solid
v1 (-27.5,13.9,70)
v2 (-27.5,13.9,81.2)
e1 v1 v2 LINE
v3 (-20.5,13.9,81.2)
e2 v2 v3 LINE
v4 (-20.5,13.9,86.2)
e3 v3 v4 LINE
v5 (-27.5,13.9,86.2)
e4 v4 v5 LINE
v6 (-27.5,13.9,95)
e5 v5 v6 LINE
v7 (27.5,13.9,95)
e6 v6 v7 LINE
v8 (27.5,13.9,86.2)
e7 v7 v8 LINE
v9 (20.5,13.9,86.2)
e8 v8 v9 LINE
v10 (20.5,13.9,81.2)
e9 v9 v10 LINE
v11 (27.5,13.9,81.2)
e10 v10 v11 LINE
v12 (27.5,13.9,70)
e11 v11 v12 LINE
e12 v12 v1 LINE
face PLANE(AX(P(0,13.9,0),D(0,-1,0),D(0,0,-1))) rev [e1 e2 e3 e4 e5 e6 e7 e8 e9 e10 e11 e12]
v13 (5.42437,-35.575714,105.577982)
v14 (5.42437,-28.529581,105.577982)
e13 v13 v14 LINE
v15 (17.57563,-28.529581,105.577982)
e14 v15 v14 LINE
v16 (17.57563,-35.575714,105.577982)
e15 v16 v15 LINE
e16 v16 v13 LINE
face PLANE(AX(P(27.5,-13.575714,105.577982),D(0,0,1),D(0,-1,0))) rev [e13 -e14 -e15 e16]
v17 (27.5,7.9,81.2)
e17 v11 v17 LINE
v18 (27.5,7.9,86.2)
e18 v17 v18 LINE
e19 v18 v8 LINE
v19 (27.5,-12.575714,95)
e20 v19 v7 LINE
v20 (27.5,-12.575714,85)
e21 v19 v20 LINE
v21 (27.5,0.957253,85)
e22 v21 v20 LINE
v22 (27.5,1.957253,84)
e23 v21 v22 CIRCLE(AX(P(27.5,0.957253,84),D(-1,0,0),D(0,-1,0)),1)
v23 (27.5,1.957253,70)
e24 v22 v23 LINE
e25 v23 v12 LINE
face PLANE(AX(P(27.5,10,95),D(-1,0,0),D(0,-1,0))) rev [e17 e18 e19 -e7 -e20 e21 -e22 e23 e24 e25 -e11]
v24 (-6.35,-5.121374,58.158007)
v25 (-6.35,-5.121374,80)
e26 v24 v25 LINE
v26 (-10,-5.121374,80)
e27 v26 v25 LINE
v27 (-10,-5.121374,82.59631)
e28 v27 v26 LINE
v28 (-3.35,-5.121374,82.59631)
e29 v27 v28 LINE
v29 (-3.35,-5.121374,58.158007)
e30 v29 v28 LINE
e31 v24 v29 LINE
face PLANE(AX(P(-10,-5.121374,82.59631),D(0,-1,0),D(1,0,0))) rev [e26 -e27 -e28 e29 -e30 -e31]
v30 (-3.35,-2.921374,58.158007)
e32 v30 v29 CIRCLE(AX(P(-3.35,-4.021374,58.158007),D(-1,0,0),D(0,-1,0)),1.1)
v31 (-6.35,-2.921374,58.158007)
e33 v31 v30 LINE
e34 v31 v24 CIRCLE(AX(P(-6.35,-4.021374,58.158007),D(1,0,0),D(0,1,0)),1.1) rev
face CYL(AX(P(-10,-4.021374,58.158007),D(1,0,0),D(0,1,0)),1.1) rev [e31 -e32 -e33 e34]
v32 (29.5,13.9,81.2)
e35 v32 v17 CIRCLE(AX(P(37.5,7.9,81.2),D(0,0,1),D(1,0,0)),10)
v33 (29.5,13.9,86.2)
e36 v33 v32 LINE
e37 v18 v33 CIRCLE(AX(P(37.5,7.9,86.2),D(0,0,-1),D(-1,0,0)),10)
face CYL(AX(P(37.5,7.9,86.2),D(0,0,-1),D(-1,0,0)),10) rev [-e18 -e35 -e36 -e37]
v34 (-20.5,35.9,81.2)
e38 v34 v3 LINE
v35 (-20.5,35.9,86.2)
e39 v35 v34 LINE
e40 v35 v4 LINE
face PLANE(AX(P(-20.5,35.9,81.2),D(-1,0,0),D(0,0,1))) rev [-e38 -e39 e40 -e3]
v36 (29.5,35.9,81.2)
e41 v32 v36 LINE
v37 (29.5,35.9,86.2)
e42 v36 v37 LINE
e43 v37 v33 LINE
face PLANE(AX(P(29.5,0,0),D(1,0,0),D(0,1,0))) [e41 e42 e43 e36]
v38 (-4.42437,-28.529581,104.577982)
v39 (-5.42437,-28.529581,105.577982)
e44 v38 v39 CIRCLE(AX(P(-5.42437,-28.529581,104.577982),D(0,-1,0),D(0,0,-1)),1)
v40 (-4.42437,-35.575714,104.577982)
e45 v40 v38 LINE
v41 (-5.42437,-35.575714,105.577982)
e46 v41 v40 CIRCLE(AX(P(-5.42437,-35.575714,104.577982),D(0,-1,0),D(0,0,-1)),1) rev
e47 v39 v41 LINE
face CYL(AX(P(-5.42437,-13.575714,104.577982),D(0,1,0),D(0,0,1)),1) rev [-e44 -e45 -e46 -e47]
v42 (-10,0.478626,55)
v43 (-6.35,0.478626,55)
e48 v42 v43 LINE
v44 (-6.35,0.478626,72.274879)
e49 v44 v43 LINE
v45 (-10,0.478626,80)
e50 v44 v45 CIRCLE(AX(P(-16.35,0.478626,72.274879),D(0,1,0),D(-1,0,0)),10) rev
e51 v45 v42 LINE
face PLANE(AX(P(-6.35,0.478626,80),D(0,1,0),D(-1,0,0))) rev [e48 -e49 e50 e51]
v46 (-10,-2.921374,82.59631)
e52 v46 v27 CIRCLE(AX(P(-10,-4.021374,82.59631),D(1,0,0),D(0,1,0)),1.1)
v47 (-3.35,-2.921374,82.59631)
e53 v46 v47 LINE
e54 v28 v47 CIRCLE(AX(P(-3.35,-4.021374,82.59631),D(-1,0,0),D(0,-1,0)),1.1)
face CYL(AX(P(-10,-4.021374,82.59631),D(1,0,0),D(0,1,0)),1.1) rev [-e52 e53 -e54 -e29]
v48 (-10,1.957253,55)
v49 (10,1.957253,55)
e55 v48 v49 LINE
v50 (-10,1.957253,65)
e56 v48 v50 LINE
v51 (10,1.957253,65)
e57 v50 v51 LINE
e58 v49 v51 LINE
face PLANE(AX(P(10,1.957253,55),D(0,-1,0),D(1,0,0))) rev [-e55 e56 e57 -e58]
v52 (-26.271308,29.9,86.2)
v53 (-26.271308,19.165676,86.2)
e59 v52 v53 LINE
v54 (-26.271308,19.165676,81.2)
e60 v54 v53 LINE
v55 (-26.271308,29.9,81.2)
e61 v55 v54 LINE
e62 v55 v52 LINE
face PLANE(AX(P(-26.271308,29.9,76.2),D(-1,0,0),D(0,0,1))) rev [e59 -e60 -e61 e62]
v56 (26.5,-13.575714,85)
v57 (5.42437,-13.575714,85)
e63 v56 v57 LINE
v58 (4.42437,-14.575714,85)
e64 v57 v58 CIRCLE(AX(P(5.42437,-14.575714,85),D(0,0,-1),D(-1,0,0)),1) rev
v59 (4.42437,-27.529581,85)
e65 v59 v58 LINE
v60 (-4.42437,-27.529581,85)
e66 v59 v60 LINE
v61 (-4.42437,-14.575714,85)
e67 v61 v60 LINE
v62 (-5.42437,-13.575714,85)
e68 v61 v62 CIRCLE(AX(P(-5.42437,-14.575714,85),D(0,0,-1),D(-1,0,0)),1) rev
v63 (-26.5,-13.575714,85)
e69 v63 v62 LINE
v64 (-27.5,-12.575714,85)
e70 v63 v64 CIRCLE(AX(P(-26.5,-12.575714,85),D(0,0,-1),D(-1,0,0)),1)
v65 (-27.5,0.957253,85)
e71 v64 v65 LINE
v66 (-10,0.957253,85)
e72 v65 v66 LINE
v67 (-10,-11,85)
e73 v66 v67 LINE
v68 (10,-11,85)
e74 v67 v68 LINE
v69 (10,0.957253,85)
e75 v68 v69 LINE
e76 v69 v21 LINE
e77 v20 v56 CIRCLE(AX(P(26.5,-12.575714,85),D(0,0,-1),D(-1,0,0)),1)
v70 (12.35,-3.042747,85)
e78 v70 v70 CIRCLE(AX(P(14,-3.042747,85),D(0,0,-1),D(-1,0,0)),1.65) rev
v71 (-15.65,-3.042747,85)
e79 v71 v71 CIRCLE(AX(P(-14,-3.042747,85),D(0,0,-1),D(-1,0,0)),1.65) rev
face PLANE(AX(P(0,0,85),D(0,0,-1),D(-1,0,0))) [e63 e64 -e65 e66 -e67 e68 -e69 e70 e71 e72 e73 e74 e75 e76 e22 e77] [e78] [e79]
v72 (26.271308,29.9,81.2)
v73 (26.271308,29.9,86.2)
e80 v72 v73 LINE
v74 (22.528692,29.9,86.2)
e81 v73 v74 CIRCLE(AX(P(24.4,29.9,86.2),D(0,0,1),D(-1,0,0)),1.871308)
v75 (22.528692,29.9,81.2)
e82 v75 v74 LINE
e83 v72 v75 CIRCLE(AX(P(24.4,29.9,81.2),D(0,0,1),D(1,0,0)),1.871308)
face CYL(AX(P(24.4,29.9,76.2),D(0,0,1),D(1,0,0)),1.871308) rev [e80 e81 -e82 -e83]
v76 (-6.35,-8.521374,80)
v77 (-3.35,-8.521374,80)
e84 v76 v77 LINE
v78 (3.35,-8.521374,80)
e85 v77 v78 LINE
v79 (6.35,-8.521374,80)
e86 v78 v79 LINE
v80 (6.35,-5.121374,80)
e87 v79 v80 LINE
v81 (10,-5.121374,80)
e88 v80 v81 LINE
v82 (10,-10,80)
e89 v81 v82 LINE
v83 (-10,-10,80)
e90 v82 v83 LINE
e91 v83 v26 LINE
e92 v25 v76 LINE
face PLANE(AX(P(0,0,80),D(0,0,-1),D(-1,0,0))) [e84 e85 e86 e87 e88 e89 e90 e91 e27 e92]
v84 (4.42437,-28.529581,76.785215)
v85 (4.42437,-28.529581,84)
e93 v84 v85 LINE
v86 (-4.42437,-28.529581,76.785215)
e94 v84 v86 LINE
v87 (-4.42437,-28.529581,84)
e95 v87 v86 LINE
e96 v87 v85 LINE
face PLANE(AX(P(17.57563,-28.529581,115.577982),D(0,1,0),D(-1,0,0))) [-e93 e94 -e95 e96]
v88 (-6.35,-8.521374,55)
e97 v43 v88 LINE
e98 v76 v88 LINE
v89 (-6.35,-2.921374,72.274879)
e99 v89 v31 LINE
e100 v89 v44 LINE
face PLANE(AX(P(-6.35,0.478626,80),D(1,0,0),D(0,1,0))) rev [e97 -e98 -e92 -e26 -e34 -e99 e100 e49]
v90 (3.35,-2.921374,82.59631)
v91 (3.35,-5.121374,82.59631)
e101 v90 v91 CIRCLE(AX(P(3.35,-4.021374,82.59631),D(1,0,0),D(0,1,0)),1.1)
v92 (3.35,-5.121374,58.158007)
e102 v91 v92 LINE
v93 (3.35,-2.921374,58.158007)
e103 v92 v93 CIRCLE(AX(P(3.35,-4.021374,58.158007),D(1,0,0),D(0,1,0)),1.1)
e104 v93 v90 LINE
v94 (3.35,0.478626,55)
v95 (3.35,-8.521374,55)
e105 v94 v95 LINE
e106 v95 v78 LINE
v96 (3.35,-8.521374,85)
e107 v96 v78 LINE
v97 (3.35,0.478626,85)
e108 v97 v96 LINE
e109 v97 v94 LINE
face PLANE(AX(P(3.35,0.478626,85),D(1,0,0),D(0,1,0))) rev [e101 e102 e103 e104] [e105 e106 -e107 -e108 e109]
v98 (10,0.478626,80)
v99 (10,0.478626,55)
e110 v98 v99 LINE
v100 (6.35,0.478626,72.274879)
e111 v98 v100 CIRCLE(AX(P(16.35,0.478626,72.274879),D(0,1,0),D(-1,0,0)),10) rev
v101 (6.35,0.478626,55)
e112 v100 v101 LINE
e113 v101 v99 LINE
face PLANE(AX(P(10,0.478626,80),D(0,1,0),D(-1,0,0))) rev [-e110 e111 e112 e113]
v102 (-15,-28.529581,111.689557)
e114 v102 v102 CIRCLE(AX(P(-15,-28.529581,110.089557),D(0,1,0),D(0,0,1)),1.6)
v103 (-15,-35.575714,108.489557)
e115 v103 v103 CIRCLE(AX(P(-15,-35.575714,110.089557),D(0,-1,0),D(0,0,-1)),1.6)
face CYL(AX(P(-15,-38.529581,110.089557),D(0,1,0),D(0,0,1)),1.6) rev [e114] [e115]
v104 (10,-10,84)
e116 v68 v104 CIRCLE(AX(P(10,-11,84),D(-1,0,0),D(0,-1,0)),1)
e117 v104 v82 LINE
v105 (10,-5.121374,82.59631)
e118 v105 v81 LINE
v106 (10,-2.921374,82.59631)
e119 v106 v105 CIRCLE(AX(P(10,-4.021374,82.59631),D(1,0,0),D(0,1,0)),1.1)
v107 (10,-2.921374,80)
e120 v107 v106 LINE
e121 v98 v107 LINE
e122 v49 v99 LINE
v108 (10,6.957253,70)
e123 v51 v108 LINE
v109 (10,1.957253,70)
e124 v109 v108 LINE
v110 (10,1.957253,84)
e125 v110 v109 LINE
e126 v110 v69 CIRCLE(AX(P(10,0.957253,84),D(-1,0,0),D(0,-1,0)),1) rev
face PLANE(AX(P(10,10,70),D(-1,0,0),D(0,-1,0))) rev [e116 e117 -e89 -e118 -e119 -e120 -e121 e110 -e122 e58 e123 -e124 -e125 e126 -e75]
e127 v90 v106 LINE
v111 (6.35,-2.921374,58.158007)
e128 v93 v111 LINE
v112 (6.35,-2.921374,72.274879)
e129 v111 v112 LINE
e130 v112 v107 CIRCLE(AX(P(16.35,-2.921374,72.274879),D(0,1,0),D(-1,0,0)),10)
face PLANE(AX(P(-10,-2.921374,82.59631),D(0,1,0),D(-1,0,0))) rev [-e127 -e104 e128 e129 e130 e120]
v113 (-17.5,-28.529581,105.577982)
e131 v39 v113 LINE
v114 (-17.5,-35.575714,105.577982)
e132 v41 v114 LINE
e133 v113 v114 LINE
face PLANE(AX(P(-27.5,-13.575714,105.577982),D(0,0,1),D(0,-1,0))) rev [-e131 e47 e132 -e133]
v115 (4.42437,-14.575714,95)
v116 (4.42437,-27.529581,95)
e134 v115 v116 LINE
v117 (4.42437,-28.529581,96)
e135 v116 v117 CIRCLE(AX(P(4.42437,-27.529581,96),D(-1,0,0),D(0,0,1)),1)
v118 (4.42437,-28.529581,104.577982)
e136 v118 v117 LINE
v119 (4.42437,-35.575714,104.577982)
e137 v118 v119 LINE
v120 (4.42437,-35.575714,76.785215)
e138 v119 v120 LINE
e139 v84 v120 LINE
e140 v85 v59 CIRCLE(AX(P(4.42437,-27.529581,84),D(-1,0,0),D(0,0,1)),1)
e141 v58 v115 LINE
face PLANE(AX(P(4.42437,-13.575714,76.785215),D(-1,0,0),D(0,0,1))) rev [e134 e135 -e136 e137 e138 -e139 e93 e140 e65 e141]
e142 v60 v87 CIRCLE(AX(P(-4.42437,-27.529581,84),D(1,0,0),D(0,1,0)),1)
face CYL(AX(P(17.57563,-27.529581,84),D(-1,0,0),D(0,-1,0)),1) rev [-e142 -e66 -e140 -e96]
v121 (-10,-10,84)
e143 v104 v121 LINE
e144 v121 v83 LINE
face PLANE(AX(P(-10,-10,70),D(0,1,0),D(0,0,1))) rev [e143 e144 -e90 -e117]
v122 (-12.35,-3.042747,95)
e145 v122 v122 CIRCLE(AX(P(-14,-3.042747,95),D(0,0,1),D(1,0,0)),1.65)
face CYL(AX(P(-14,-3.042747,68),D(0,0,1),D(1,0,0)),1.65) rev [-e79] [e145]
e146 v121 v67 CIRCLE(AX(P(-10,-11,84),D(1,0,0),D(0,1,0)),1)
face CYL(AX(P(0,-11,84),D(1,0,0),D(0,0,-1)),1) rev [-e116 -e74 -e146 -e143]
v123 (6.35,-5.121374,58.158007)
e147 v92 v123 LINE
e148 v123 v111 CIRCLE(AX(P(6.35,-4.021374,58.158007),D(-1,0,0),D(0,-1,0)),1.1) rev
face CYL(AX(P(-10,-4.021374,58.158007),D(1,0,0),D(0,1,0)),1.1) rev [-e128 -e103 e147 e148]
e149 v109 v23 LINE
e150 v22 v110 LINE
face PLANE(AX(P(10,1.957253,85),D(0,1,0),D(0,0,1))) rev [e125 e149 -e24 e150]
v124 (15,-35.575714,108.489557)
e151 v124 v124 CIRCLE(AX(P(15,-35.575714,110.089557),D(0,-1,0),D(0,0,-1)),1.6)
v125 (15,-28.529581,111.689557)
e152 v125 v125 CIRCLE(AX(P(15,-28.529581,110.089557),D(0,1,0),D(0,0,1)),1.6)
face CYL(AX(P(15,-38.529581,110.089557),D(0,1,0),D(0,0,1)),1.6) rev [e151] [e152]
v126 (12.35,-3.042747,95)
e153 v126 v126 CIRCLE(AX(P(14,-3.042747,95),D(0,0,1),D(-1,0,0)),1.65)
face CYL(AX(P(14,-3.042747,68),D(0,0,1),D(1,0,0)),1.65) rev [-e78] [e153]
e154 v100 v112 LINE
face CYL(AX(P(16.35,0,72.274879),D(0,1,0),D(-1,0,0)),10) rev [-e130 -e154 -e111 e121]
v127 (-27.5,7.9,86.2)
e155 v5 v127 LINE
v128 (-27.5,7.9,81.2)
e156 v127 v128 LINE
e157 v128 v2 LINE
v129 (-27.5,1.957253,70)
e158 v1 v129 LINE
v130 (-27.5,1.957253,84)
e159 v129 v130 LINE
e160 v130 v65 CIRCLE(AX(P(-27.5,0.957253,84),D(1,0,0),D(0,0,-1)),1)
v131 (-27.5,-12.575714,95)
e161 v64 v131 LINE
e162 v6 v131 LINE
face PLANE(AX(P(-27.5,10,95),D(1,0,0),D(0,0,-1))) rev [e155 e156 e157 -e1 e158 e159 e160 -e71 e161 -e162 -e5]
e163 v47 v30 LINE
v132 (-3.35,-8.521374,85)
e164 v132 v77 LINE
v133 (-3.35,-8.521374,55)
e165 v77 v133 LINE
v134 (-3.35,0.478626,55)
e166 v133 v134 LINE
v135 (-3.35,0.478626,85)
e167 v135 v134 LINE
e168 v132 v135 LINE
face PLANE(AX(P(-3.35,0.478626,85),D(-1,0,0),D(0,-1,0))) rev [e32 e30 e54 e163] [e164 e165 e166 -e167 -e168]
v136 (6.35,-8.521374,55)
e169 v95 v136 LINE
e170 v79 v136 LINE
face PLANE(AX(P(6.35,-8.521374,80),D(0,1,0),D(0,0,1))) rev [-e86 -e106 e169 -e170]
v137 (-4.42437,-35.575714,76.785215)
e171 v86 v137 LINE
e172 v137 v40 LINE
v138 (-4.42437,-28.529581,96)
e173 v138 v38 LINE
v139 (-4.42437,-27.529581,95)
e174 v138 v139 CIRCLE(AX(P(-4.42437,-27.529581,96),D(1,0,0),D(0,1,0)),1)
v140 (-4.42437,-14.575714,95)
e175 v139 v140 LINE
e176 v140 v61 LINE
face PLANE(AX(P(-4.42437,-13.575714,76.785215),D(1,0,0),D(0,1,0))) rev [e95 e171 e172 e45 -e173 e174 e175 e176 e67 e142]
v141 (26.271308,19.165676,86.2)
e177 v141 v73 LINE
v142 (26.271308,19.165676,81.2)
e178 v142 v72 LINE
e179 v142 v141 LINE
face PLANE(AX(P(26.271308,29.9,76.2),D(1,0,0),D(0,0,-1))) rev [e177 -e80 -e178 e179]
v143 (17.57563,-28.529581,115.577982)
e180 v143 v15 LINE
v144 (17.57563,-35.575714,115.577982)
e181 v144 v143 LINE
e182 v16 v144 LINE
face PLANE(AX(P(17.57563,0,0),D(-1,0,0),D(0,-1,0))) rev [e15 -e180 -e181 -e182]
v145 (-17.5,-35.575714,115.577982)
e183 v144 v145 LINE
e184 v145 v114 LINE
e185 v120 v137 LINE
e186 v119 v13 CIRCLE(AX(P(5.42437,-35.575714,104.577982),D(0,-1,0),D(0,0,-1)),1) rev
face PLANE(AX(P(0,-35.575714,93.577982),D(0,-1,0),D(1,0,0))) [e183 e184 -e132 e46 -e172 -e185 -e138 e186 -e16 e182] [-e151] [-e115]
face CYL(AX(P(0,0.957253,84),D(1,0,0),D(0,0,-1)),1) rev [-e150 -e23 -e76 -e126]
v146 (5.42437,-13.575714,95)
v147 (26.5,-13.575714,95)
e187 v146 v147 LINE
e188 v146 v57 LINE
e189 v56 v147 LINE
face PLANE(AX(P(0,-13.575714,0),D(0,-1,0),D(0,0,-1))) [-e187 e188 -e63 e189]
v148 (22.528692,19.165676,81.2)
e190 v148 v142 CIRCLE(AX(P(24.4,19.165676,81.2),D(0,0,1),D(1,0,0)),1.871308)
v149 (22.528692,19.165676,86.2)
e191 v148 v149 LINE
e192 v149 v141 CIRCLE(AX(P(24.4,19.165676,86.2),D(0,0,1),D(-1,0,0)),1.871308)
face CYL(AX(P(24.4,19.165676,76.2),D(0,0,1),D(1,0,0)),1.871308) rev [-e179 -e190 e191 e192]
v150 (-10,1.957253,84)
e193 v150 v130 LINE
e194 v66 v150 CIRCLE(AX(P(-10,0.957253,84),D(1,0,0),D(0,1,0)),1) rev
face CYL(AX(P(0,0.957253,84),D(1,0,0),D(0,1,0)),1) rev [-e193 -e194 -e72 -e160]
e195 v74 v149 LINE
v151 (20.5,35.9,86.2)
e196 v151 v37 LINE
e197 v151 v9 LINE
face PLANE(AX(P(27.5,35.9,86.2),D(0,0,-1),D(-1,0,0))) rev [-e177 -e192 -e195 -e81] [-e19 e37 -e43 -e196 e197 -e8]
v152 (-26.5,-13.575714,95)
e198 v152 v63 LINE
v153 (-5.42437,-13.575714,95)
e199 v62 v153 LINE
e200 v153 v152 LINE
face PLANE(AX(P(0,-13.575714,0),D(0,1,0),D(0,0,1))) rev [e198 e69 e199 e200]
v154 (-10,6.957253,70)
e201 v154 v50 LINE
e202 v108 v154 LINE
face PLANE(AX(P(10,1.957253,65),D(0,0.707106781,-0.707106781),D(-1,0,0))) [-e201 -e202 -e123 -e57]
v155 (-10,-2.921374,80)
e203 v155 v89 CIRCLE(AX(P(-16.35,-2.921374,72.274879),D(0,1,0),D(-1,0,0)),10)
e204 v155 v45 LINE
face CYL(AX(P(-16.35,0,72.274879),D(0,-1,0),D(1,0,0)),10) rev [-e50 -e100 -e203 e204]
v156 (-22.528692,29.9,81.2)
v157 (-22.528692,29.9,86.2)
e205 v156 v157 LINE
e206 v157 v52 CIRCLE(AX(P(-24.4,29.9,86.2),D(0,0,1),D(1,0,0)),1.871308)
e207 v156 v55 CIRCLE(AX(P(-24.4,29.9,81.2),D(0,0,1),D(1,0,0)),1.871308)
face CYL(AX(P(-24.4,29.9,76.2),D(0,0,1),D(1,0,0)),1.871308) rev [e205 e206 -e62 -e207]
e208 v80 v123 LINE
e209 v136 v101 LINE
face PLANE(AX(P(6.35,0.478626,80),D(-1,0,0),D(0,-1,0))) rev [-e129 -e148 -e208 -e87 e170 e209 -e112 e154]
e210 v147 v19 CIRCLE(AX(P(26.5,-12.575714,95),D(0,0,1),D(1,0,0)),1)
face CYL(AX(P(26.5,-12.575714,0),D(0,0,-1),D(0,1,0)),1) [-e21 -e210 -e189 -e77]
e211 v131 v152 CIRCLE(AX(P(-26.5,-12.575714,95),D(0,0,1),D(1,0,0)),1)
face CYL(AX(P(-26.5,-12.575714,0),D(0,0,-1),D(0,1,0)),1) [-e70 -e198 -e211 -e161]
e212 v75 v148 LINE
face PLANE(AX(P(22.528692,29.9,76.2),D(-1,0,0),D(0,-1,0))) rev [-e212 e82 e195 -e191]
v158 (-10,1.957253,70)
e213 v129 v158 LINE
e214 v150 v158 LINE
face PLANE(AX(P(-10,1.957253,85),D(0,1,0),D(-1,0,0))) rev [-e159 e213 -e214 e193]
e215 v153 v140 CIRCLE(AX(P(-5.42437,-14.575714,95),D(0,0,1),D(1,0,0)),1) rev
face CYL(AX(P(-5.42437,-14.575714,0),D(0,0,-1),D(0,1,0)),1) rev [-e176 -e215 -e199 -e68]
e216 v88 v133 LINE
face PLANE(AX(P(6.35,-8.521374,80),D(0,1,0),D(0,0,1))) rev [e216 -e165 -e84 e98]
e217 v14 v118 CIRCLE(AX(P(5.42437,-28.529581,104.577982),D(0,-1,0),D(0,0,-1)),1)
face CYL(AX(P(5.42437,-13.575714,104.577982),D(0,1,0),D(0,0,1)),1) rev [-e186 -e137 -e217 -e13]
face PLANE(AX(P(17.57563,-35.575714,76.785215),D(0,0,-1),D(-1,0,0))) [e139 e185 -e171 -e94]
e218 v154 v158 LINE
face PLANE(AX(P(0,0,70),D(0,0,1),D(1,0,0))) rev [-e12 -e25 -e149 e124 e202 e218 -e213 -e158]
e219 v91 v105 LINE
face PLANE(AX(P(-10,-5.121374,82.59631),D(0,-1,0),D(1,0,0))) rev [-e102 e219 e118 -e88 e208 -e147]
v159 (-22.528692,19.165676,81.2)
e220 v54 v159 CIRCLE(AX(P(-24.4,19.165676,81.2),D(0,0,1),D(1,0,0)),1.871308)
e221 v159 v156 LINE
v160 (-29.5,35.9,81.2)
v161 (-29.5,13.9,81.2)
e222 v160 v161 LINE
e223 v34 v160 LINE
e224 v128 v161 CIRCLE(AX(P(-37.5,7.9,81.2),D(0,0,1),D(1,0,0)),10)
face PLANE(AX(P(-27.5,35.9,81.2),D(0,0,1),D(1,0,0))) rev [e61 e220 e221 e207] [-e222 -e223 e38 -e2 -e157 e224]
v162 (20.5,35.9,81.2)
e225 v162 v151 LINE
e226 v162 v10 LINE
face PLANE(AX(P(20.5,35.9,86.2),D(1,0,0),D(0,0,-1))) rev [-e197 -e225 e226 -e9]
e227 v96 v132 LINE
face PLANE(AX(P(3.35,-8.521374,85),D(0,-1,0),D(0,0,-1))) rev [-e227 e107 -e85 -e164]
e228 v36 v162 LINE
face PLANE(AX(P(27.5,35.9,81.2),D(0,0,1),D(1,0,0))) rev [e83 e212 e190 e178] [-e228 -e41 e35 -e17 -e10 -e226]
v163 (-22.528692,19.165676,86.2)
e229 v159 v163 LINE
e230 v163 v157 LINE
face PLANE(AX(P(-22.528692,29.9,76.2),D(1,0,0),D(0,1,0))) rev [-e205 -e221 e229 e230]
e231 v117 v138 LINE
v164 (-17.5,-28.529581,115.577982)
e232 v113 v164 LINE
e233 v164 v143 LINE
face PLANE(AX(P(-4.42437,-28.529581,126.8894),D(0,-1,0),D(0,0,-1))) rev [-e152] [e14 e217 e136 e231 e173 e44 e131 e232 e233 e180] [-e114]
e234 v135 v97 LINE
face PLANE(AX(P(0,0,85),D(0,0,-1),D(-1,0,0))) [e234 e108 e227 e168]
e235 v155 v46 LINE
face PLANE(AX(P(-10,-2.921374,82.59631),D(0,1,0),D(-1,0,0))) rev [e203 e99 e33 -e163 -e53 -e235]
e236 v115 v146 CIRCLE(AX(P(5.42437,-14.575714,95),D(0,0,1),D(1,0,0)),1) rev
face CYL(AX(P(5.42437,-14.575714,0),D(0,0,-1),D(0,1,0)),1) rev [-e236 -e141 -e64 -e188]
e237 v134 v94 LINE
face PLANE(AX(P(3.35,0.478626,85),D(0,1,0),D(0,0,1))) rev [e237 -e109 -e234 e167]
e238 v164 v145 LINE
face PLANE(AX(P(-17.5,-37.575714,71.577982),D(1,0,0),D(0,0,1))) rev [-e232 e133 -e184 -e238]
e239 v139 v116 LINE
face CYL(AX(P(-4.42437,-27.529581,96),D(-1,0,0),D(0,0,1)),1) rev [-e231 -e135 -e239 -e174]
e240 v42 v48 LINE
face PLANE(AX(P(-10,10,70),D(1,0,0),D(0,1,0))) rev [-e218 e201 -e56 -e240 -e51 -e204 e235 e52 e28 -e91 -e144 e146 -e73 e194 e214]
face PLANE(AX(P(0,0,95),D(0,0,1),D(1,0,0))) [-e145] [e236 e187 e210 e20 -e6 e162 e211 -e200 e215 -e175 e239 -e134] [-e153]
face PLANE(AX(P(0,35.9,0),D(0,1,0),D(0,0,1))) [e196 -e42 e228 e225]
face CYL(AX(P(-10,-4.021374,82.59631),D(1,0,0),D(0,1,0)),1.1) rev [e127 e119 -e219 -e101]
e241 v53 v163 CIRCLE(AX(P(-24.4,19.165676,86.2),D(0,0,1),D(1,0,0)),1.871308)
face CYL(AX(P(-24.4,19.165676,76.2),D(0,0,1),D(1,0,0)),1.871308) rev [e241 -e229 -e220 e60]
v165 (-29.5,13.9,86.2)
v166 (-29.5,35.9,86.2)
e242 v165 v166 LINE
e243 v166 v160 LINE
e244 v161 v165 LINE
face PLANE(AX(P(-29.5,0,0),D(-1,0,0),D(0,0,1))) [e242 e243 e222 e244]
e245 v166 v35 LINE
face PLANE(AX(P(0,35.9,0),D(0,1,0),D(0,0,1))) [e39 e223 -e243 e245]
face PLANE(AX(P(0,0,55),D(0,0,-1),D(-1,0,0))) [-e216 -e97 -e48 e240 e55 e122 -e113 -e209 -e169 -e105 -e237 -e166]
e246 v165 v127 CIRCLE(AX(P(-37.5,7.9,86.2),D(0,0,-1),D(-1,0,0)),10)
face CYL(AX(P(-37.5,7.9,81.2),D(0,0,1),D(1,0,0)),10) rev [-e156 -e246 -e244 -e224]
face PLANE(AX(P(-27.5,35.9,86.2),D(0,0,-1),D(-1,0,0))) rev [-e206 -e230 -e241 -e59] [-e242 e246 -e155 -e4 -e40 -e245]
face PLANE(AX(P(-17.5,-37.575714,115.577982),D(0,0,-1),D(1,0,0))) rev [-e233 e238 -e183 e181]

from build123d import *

# Parameters (mm, degrees)
SKETCH_1_W            = 35
SKETCH_1_H            = 40
EXTRUDE_1_DEPTH       = 5
SKETCH_2_W            = 20
SKETCH_2_H            = 20
EXTRUDE_2_DEPTH       = 65
SKETCH_3_W            = 56
SKETCH_3_H            = 11
SKETCH_3_W_2          = 4.5
CUT_EXTRUDE_1_DEPTH   = 78.821912081
SKETCH_5_W            = 55
SKETCH_5_H            = 20
EXTRUDE_3_DEPTH       = 25
SKETCH_9_R            = 1.65
CUT_EXTRUDE_3_DEPTH   = 27
SKETCH_10_W           = 55
SKETCH_10_H           = 25
EXTRUDE_4_DEPTH       = 4.9
SKETCH_11_W           = 7
SKETCH_11_H           = 5
EXTRUDE_5_DEPTH       = 21
CHAMFER_2_SIZE        = 10
CHAMFER_3_SIZE        = 3
CHAMFER_4_SIZE        = 2
CUT_EXTRUDE_7_DEPTH   = 15
SKETCH_16_W           = 12.984556049
SKETCH_16_H           = 11
EXTRUDE_6_DEPTH       = 20
CHAMFER_5_SIZE        = 3
SKETCH_19_R           = 1.6
CUT_EXTRUDE_10_DEPTH  = 10
FILLET_1_R            = 5
SKETCH_20_W           = 5
SKETCH_20_H           = 22.5
EXTRUDE_7_DEPTH       = 17.5
SKETCH_21_W           = 5
SKETCH_21_H           = 22.5
EXTRUDE_8_DEPTH       = 5
SKETCH_22_W           = 5
SKETCH_22_H           = 22.5
EXTRUDE_9_DEPTH       = 10
SKETCH_23_W           = 5
SKETCH_23_H           = 22.5
EXTRUDE_10_DEPTH      = 10
SKETCH_24_W           = 3.3
SKETCH_24_H           = 22.5
EXTRUDE_11_DEPTH      = 4
SKETCH_26_W           = 5
SKETCH_26_H           = 22.5
EXTRUDE_13_DEPTH      = 17.5
SKETCH_27_W           = 5
SKETCH_27_H           = 22.5
EXTRUDE_14_DEPTH      = 5
SKETCH_28_W           = 5
SKETCH_28_H           = 22.5
EXTRUDE_15_DEPTH      = 10
SKETCH_29_W           = 5
SKETCH_29_H           = 22.5
EXTRUDE_16_DEPTH      = 10
SKETCH_31_W           = 3.4
SKETCH_31_H           = 22.5
EXTRUDE_18_DEPTH      = 4
SKETCH_39_W           = 7.13678645
SKETCH_39_H           = 13.518332953
SKETCH_39_W_2         = 8.139264071
SKETCH_39_H_2         = 10.52230198
CUT_EXTRUDE_17_DEPTH  = 35
SKETCH_40_W           = 55
SKETCH_40_H           = 10
EXTRUDE_20_DEPTH      = 25.575713879
SKETCH_41_W           = 8.84873954
SKETCH_41_H           = 7.046133319
EXTRUDE_21_DEPTH      = 20.577981656
EXTRUDE_22_DEPTH      = 13.07563
EXTRUDE_22_DEPTH_BACK = 22
SKETCH_42_W           = 38.79276714
SKETCH_42_H           = 7.046133319
SKETCH_43_W           = 23.07563023
SKETCH_43_H           = 28.79276714
CUT_EXTRUDE_18_DEPTH  = 22
FILLET_3_R            = 1
SKETCH_46_W           = 9.238205764
SKETCH_46_H           = 22.5
EXTRUDE_26_DEPTH      = 10
CUT_EXTRUDE_19_DEPTH  = 10
SKETCH_48_R           = 1.6
CUT_EXTRUDE_20_DEPTH  = 10
CUT_EXTRUDE_21_DEPTH  = 10
SKETCH_50_W           = 2.57104036
SKETCH_50_H           = 22.5
SKETCH_50_W_2         = 2.865096637
EXTRUDE_27_DEPTH      = 10
SKETCH_53_W           = 4.304606657
SKETCH_53_H           = 10
SKETCH_53_W_2         = 2.865096637
EXTRUDE_28_DEPTH      = 11
SKETCH_51_R           = 1.6
CUT_EXTRUDE_22_DEPTH  = 12
SKETCH_52_W           = 17.2
SKETCH_52_H           = 6.8
CUT_EXTRUDE_23_DEPTH  = 39
CUT_EXTRUDE_24_DEPTH  = 10
SKETCH_55_W           = 32
SKETCH_55_H           = 22.5
EXTRUDE_29_DEPTH      = 12
SKETCH_56_W           = 10.301119562
SKETCH_56_H           = 22.5
CUT_EXTRUDE_25_DEPTH  = 7
SKETCH_57_W           = 3
SKETCH_57_H           = 4.95
EXTRUDE_30_DEPTH      = 8
SKETCH_58_W           = 9
SKETCH_58_H           = 22.5
SKETCH_58_W_2         = 8.434386946
CUT_EXTRUDE_26_DEPTH  = 10.05
CUT_EXTRUDE_27_DEPTH  = 1
SKETCH_60_W           = 2.55
SKETCH_60_H           = 22.5
EXTRUDE_31_DEPTH      = 12
SKETCH_61_W           = 3.965384327
SKETCH_61_H           = 22.5
CUT_EXTRUDE_28_DEPTH  = 6.95
SKETCH_62_W           = 5
SKETCH_62_H           = 22
EXTRUDE_32_DEPTH      = 2
SKETCH_63_W           = 5
SKETCH_63_H           = 22
EXTRUDE_33_DEPTH      = 2
SKETCH_64_W           = 5
SKETCH_64_H           = 22.5
EXTRUDE_34_DEPTH      = 8
SKETCH_65_W           = 0.1
SKETCH_65_H           = 22.5
CUT_EXTRUDE_30_DEPTH  = 15
SKETCH_66_W           = 5
SKETCH_66_H           = 22.5
EXTRUDE_35_DEPTH      = 8
SKETCH_67_R           = 1.1
CUT_EXTRUDE_31_DEPTH  = 9
SKETCH_68_W           = 0.1
SKETCH_68_H           = 22.5
CUT_EXTRUDE_32_DEPTH  = 12
SKETCH_69_W           = 12
SKETCH_69_H           = 22.5
EXTRUDE_36_DEPTH      = 5
SKETCH_70_W           = 107.728068616
SKETCH_70_H           = 75.066227262
CUT_EXTRUDE_33_DEPTH  = 130
SKETCH_73_W           = 6.7
SKETCH_73_H           = 9
CUT_EXTRUDE_34_DEPTH  = 15
FILLET_5_R            = 10
SKETCH_75_W           = 20
SKETCH_75_H           = 11.957252994
SKETCH_75_W_2         = 6.7
SKETCH_75_H_2         = 9
EXTRUDE_38_DEPTH      = 15
CUT_EXTRUDE_35_DEPTH  = 20
CUT_EXTRUDE_36_DEPTH  = 25
FILLET_6_R            = 10
CHAMFER_6_SIZE        = 5


with BuildPart() as part:
    # 草图1 → 凸台-拉伸1 (new body)
    with BuildSketch(Plane.XY):
        Rectangle(SKETCH_1_W, SKETCH_1_H)
    extrude(amount=EXTRUDE_1_DEPTH)

    # 草图2 → 凸台-拉伸2 (add)
    with BuildSketch(Plane.XY.offset(5)):
        Rectangle(SKETCH_2_W, SKETCH_2_H)
    extrude(amount=EXTRUDE_2_DEPTH)

    # 草图3 → 切除-拉伸1 (cut, through all)
    with BuildSketch(Plane.ZY.offset(10)):
        with Locations((37.5, 0)):
            Rectangle(SKETCH_3_W, SKETCH_3_H)
        with Locations((7.25, 0)):
            Rectangle(SKETCH_3_W_2, SKETCH_3_H)
    extrude(amount=-CUT_EXTRUDE_1_DEPTH, mode=Mode.SUBTRACT)

    # 草图5 → 凸台-拉伸3 (add)
    with BuildSketch(Plane.XY.offset(70)):
        Rectangle(SKETCH_5_W, SKETCH_5_H)
    extrude(amount=EXTRUDE_3_DEPTH)

    # 草图9 → 切除-拉伸3 (cut)
    with BuildSketch(Plane.XY.offset(95)):
        with Locations((-14, -3.042747006)):
            Circle(SKETCH_9_R)
        with Locations((14, -3.042747006)):
            Circle(SKETCH_9_R)
    extrude(amount=-CUT_EXTRUDE_3_DEPTH, mode=Mode.SUBTRACT)

    # 草图10 → 凸台-拉伸4 (add)
    with BuildSketch(Plane(origin=(0, 10, 0), x_dir=(1, 0, 0), z_dir=(0, 1, 0))):
        with Locations((0, -82.5)):
            Rectangle(SKETCH_10_W, SKETCH_10_H)
    extrude(amount=EXTRUDE_4_DEPTH)

    # 草图11 → 凸台-拉伸5 (add)
    with BuildSketch(Plane(origin=(0, 14.9, 0), x_dir=(1, 0, 0), z_dir=(0, 1, 0))):
        with Locations((-24, -83.7)):
            Rectangle(SKETCH_11_W, SKETCH_11_H)
        with Locations((24, -83.7)):
            Rectangle(SKETCH_11_W, SKETCH_11_H)
    extrude(amount=EXTRUDE_5_DEPTH)

    # 倒角2
    chamfer_2_edges = [part.edges().sort_by_distance(p)[0] for p in [
        (0, -5.5, 65.5),
    ]]
    chamfer(chamfer_2_edges, length=CHAMFER_2_SIZE)

    # 倒角3
    chamfer_3_edges = [part.edges().sort_by_distance(p)[0] for p in [
        (0, 10, 70),
    ]]
    chamfer(chamfer_3_edges, length=CHAMFER_3_SIZE)

    # 倒角4
    chamfer_4_edges = [part.edges().sort_by_distance(p)[0] for p in [
        (0, -10, 5),
    ]]
    chamfer(chamfer_4_edges, length=CHAMFER_4_SIZE)

    # 草图15 → 切除-拉伸7 (cut)
    with BuildSketch(Plane(origin=(0, 0, 70), x_dir=(-1, 0, 0), z_dir=(0, 0, -1))):
        Polygon((10, 1.957252994), (29.13083687, 1.957252994), (29.13083687, -8.042747006), (29.13083687, -10), (10, -10), (10, -8.042747006), align=None)
        Polygon((-29.13083687, 1.957252994), (-29.13083687, -8.042747006), (-29.13083687, -10), (-10, -10), (-10, -8.042747006), (-10, 1.957252994), align=None)
    extrude(amount=-CUT_EXTRUDE_7_DEPTH, mode=Mode.SUBTRACT)

    # 草图16 → 凸台-拉伸6 (add)
    with BuildSketch(Plane.ZY.offset(10)):
        with Locations((11.492278025, 0)):
            Rectangle(SKETCH_16_W, SKETCH_16_H)
    extrude(amount=-EXTRUDE_6_DEPTH)

    # 倒角5
    chamfer_5_edges = [part.edges().sort_by_distance(p)[0] for p in [
        (0, 5.5, 17.984556049),
    ]]
    chamfer(chamfer_5_edges, length=CHAMFER_5_SIZE)

    # 草图19 → 切除-拉伸10 (cut)
    with BuildSketch(Plane.XY.offset(86.2)):
        with Locations((-24.4, 29.9)):
            Circle(SKETCH_19_R)
        with Locations((-24.4, 19.9)):
            Circle(SKETCH_19_R)
        with Locations((24.4, 19.9)):
            Circle(SKETCH_19_R)
        with Locations((24.4, 29.9)):
            Circle(SKETCH_19_R)
    extrude(amount=-CUT_EXTRUDE_10_DEPTH, mode=Mode.SUBTRACT)

    # 圆角1
    fillet_1_edges = [part.edges().sort_by_distance(p)[0] for p in [
        (17.5, -20, 2.5),
        (-17.5, -20, 2.5),
        (-17.5, 20, 2.5),
        (17.5, 20, 2.5),
    ]]
    fillet(fillet_1_edges, radius=FILLET_1_R)

    # 草图20 → 凸台-拉伸7 (add)
    with BuildSketch(Plane.ZY.offset(17.5)):
        with Locations((2.5, 0)):
            Rectangle(SKETCH_20_W, SKETCH_20_H)
    extrude(amount=EXTRUDE_7_DEPTH)

    # 草图21 → 凸台-拉伸8 (add)
    with BuildSketch(Plane.ZY.offset(35)):
        with Locations((2.5, 0)):
            Rectangle(SKETCH_21_W, SKETCH_21_H)
    extrude(amount=EXTRUDE_8_DEPTH)

    # 草图22 → 凸台-拉伸9 (add)
    with BuildSketch(Plane(origin=(0, 0, 0), x_dir=(-1, 0, 0), z_dir=(0, 0, -1))):
        with Locations((37.5, 0)):
            Rectangle(SKETCH_22_W, SKETCH_22_H)
    extrude(amount=EXTRUDE_9_DEPTH)

    # 草图23 → 凸台-拉伸10 (add)
    with BuildSketch(Plane(origin=(0, 0, 0), x_dir=(-1, 0, 0), z_dir=(0, 0, -1))):
        with Locations((15.5, 0)):
            Rectangle(SKETCH_23_W, SKETCH_23_H)
    extrude(amount=EXTRUDE_10_DEPTH)

    # 草图24 → 凸台-拉伸11 (add)
    with BuildSketch(Plane.ZY.offset(18)):
        with Locations((-8.35, 0)):
            Rectangle(SKETCH_24_W, SKETCH_24_H)
    extrude(amount=EXTRUDE_11_DEPTH)

    # 草图26 → 凸台-拉伸13 (add)
    with BuildSketch(Plane(origin=(17.5, 0, 0), x_dir=(0, 0, -1), z_dir=(1, 0, 0))):
        with Locations((-2.5, 0)):
            Rectangle(SKETCH_26_W, SKETCH_26_H)
    extrude(amount=EXTRUDE_13_DEPTH)

    # 草图27 → 凸台-拉伸14 (add)
    with BuildSketch(Plane(origin=(35, 0, 0), x_dir=(0, 0, -1), z_dir=(1, 0, 0))):
        with Locations((-2.5, 0)):
            Rectangle(SKETCH_27_W, SKETCH_27_H)
    extrude(amount=EXTRUDE_14_DEPTH)

    # 草图28 → 凸台-拉伸15 (add)
    with BuildSketch(Plane(origin=(0, 0, 0), x_dir=(-1, 0, 0), z_dir=(0, 0, -1))):
        with Locations((-37.5, 0)):
            Rectangle(SKETCH_28_W, SKETCH_28_H)
    extrude(amount=EXTRUDE_15_DEPTH)

    # 草图29 → 凸台-拉伸16 (add)
    with BuildSketch(Plane(origin=(0, 0, 0), x_dir=(-1, 0, 0), z_dir=(0, 0, -1))):
        with Locations((-15.5, 0)):
            Rectangle(SKETCH_29_W, SKETCH_29_H)
    extrude(amount=EXTRUDE_16_DEPTH)

    # 草图31 → 凸台-拉伸18 (add)
    with BuildSketch(Plane(origin=(18, 0, 0), x_dir=(0, 0, -1), z_dir=(1, 0, 0))):
        with Locations((8.3, 0)):
            Rectangle(SKETCH_31_W, SKETCH_31_H)
    extrude(amount=EXTRUDE_18_DEPTH)

    # 草图39 → 切除-拉伸17 (cut)
    with BuildSketch(Plane.ZY.offset(17.5)):
        with Locations((3.568393225, 18.009166476)):
            Rectangle(SKETCH_39_W, SKETCH_39_H)
        with Locations((4.069632036, -16.51115099)):
            Rectangle(SKETCH_39_W_2, SKETCH_39_H_2)
    extrude(amount=-CUT_EXTRUDE_17_DEPTH, mode=Mode.SUBTRACT)

    # 草图40 → 凸台-拉伸20 (add)
    with BuildSketch(Plane.XZ.offset(10)):
        with Locations((0, 90)):
            Rectangle(SKETCH_40_W, SKETCH_40_H)
    extrude(amount=EXTRUDE_20_DEPTH)

    # 草图41 → 凸台-拉伸21 (add)
    with BuildSketch(Plane.XY.offset(95)):
        with Locations((0, -32.05264722)):
            Rectangle(SKETCH_41_W, SKETCH_41_H)
    extrude(amount=EXTRUDE_21_DEPTH)

    # 草图42 → 凸台-拉伸22 (add, two sides: drawn at the far end of the back side and taken through both)
    with BuildSketch(Plane.ZY.offset(4.42436977).offset(-EXTRUDE_22_DEPTH_BACK)):
        with Locations((96.181598086, -32.05264722)):
            Rectangle(SKETCH_42_W, SKETCH_42_H)
    extrude(amount=EXTRUDE_22_DEPTH + EXTRUDE_22_DEPTH_BACK)

    # 草图43 → 切除-拉伸18 (cut)
    with BuildSketch(Plane.XZ.offset(35.575713879)):
        with Locations((15.962184885, 91.181598086)):
            Rectangle(SKETCH_43_W, SKETCH_43_H)
        with Locations((-15.962184885, 91.181598086)):
            Rectangle(SKETCH_43_W, SKETCH_43_H)
    extrude(amount=-CUT_EXTRUDE_18_DEPTH, mode=Mode.SUBTRACT)

    # 圆角3
    fillet_3_edges = [part.edges().sort_by_distance(p)[0] for p in [
        (-18.75, 1.957252994, 85),
        (18.75, 1.957252994, 85),
        (0, -10, 85),
        (0, -28.52958056, 85),
        (0, -28.52958056, 95),
        (4.42436977, -32.052647219, 105.577981656),
        (27.5, -13.575713879, 90),
        (4.42436977, -13.575713879, 90),
        (-27.5, -13.575713879, 90),
        (-4.42436977, -32.052647219, 105.577981656),
        (-4.42436977, -13.575713879, 90),
    ]]
    fillet(fillet_3_edges, radius=FILLET_3_R)

    # 草图46 → 凸台-拉伸26 (add)
    with BuildSketch(Plane(origin=(0, 0, 0), x_dir=(-1, 0, 0), z_dir=(0, 0, -1))):
        with Locations((-8.380897118, 0)):
            Rectangle(SKETCH_46_W, SKETCH_46_H)
    extrude(amount=EXTRUDE_26_DEPTH)

    # 草图47 → 切除-拉伸19 (cut)
    with BuildSketch(Plane(origin=(0, 0, -10), x_dir=(-1, 0, 0), z_dir=(0, 0, -1))):
        with BuildLine():
            Line((-8.066400893, 11.25), (-10.700516417, 11.25))
            Line((-10.700516417, 11.25), (-10.700516417, -11.25))
            Line((-10.700516417, -11.25), (-6.332834596, -11.25))
            ThreePointArc((-6.332834596, -11.25), (-6.663682414, -9.62836823), (-8.066400893, -8.75))
            Line((-8.066400893, -8.75), (-8.066400893, -7.900028072))
            ThreePointArc((-8.066400893, -7.900028072), (-6.289381928, -5.825014036), (-8.066400893, -3.75))
            Line((-8.066400893, -3.75), (-8.066400893, -2.900028072))
            ThreePointArc((-8.066400893, -2.900028072), (-6.289381928, -0.825014036), (-8.066400893, 1.25))
            Line((-8.066400893, 1.25), (-8.066400893, 2.099971928))
            ThreePointArc((-8.066400893, 2.099971928), (-6.289381928, 4.174985964), (-8.066400893, 6.25))
            Line((-8.066400893, 6.25), (-8.066400893, 7.099971928))
            ThreePointArc((-8.066400893, 7.099971928), (-6.289381928, 9.174985964), (-8.066400893, 11.25))
        make_face()
    extrude(amount=-CUT_EXTRUDE_19_DEPTH, mode=Mode.SUBTRACT)

    # 草图48 → 切除-拉伸20 (cut)
    with BuildSketch(Plane(origin=(0, -28.52958056, 0), x_dir=(1, 0, 0), z_dir=(0, 1, 0))):
        with Locations(Location((15, -110.089556655, 0), (0, 0, 270))):
            Circle(SKETCH_48_R)
        with Locations(Location((-15, -110.089556655, 0), (0, 0, 270))):
            Circle(SKETCH_48_R)
    extrude(amount=-CUT_EXTRUDE_20_DEPTH, mode=Mode.SUBTRACT)

    # 草图49 → 切除-拉伸21 (cut)
    with BuildSketch(Plane.XY.offset(86.2)):
        with BuildLine():
            Line((-22.528691915, 29.9), (-22.528691915, 19.165676086))
            ThreePointArc((-22.528691915, 19.165676086), (-24.4, 17.294368), (-26.271308085, 19.165676086))
            Line((-26.271308085, 19.165676086), (-26.271308085, 29.9))
            ThreePointArc((-26.271308085, 29.9), (-24.4, 31.771308085), (-22.528691915, 29.9))
        make_face()
        with BuildLine():
            Line((22.528691915, 29.9), (22.528691915, 19.165676086))
            ThreePointArc((22.528691915, 19.165676086), (24.4, 17.294368), (26.271308085, 19.165676086))
            Line((26.271308085, 19.165676086), (26.271308085, 29.9))
            ThreePointArc((26.271308085, 29.9), (24.4, 31.771308085), (22.528691915, 29.9))
        make_face()
    extrude(amount=-CUT_EXTRUDE_21_DEPTH, mode=Mode.SUBTRACT)

    # 草图50 → 凸台-拉伸27 (add)
    with BuildSketch(Plane(origin=(0, 0, -10), x_dir=(-1, 0, 0), z_dir=(0, 0, -1))):
        with Locations((-5.047314416, 0)):
            Rectangle(SKETCH_50_W, SKETCH_50_H)
        with Locations((-12.133064736, 0)):
            Rectangle(SKETCH_50_W_2, SKETCH_50_H)
    extrude(amount=EXTRUDE_27_DEPTH)

    # 草图53 → 凸台-拉伸28 (add)
    with BuildSketch(Plane(origin=(0, 11.25, 0), x_dir=(1, 0, 0), z_dir=(0, 1, 0))):
        with Locations((5.914097565, 5)):
            Rectangle(SKETCH_53_W, SKETCH_53_H)
        with Locations((12.133064736, 5)):
            Rectangle(SKETCH_53_W_2, SKETCH_53_H)
    extrude(amount=EXTRUDE_28_DEPTH)

    # 草图51 → 切除-拉伸22 (cut)
    with BuildSketch(Plane(origin=(13.565613054, 0, 0), x_dir=(0, 0, -1), z_dir=(1, 0, 0))):
        with Locations((16, 6.25)):
            Circle(SKETCH_51_R)
        with Locations((16, -6.25)):
            Circle(SKETCH_51_R)
    extrude(amount=-CUT_EXTRUDE_22_DEPTH, mode=Mode.SUBTRACT)

    # 草图52 → 切除-拉伸23 (cut)
    with BuildSketch(Plane(origin=(0, 11.25, 0), x_dir=(1, 0, 0), z_dir=(0, 1, 0))):
        with Locations((-26.5, 3.35)):
            Rectangle(SKETCH_52_W, SKETCH_52_H)
        with Locations((26.5, 3.35)):
            Rectangle(SKETCH_52_W, SKETCH_52_H)
    extrude(amount=-CUT_EXTRUDE_23_DEPTH, mode=Mode.SUBTRACT)

    # 草图54 → 切除-拉伸24 (cut)
    with BuildSketch(Plane(origin=(0, 0, -10), x_dir=(-1, 0, 0), z_dir=(0, 0, -1))):
        with BuildLine():
            ThreePointArc((-8.066400893, 12.099971928), (-6.289381928, 14.174985964), (-8.066400893, 16.25))
            Line((-8.066400893, 16.25), (-8.066400893, 12.099971928))
        make_face()
        with BuildLine():
            ThreePointArc((-8.066400893, 17.099971928), (-6.289381928, 19.174985964), (-8.066400893, 21.25))
            Line((-8.066400893, 21.25), (-8.066400893, 17.099971928))
        make_face()
    extrude(amount=-CUT_EXTRUDE_24_DEPTH, mode=Mode.SUBTRACT)

    # 草图55 → 凸台-拉伸29 (add)
    with BuildSketch(Plane.XY.offset(5)):
        Rectangle(SKETCH_55_W, SKETCH_55_H)
    extrude(amount=EXTRUDE_29_DEPTH)

    # 草图56 → 切除-拉伸25 (cut)
    with BuildSketch(Plane(origin=(0, 0, 0), x_dir=(-1, 0, 0), z_dir=(0, 0, -1))):
        with Locations((7.849440219, 0)):
            Rectangle(SKETCH_56_W, SKETCH_56_H)
    extrude(amount=-CUT_EXTRUDE_25_DEPTH, mode=Mode.SUBTRACT)

    # 草图57 → 凸台-拉伸30 (add)
    with BuildSketch(Plane(origin=(0, 11.25, 0), x_dir=(1, 0, 0), z_dir=(0, 1, 0))):
        with Locations((-18.465384327, -2.525)):
            Rectangle(SKETCH_57_W, SKETCH_57_H)
        with Locations((-34.665384327, -2.525)):
            Rectangle(SKETCH_57_W, SKETCH_57_H)
    extrude(amount=EXTRUDE_30_DEPTH)

    # 草图58 → 切除-拉伸26 (cut)
    with BuildSketch(Plane(origin=(0, 0, -10), x_dir=(-1, 0, 0), z_dir=(0, 0, -1))):
        with Locations((17.5, 0)):
            Rectangle(SKETCH_58_W, SKETCH_58_H)
        with Locations((-17.782806527, 0)):
            Rectangle(SKETCH_58_W_2, SKETCH_58_H)
    extrude(amount=-CUT_EXTRUDE_26_DEPTH, mode=Mode.SUBTRACT)

    # 草图59 → 切除-拉伸27 (cut)
    with BuildSketch(Plane(origin=(0, 14.9, 0), x_dir=(1, 0, 0), z_dir=(0, 1, 0))):
        Polygon((20.5, -86.2), (20.5, -81.2), (27.5, -81.2), (27.5, -70), (-27.5, -70), (-27.5, -81.2), (-20.5, -81.2), (-20.5, -86.2), (-27.5, -86.2), (-27.5, -95), (27.5, -95), (27.5, -86.2), align=None)
    extrude(amount=-CUT_EXTRUDE_27_DEPTH, mode=Mode.SUBTRACT)

    # 草图60 → 凸台-拉伸31 (add)
    with BuildSketch(Plane.XY.offset(5)):
        with Locations((-17.275, 0)):
            Rectangle(SKETCH_60_W, SKETCH_60_H)
        with Locations((17.275, 0)):
            Rectangle(SKETCH_60_W, SKETCH_60_H)
    extrude(amount=EXTRUDE_31_DEPTH)

    # 草图61 → 切除-拉伸28 (cut)
    with BuildSketch(Plane(origin=(0, 0, 0.05), x_dir=(-1, 0, 0), z_dir=(0, 0, -1))):
        with Locations((14.982692164, 0)):
            Rectangle(SKETCH_61_W, SKETCH_61_H)
    extrude(amount=-CUT_EXTRUDE_28_DEPTH, mode=Mode.SUBTRACT)

    # 草图62 → 凸台-拉伸32 (add)
    with BuildSketch(Plane.ZY.offset(27.5)):
        with Locations((83.7, 24.9)):
            Rectangle(SKETCH_62_W, SKETCH_62_H)
    extrude(amount=EXTRUDE_32_DEPTH)

    # 草图63 → 凸台-拉伸33 (add)
    with BuildSketch(Plane(origin=(27.5, 0, 0), x_dir=(0, 0, -1), z_dir=(1, 0, 0))):
        with Locations((-83.7, 24.9)):
            Rectangle(SKETCH_63_W, SKETCH_63_H)
    extrude(amount=EXTRUDE_33_DEPTH)

    # 草图64 → 凸台-拉伸34 (add)
    with BuildSketch(Plane(origin=(0, 0, -10), x_dir=(-1, 0, 0), z_dir=(0, 0, -1))):
        with Locations((-37.5, 0)):
            Rectangle(SKETCH_64_W, SKETCH_64_H)
    extrude(amount=EXTRUDE_34_DEPTH)

    # 草图65 → 切除-拉伸30 (cut)
    with BuildSketch(Plane(origin=(0, 0, -18), x_dir=(-1, 0, 0), z_dir=(0, 0, -1))):
        with Locations((-35.05, 0)):
            Rectangle(SKETCH_65_W, SKETCH_65_H)
    extrude(amount=-CUT_EXTRUDE_30_DEPTH, mode=Mode.SUBTRACT)

    # 草图66 → 凸台-拉伸35 (add)
    with BuildSketch(Plane(origin=(0, 0, -10), x_dir=(-1, 0, 0), z_dir=(0, 0, -1))):
        with Locations((37.5, 0)):
            Rectangle(SKETCH_66_W, SKETCH_66_H)
    extrude(amount=EXTRUDE_35_DEPTH)

    # 草图67 → 切除-拉伸31 (cut)
    with BuildSketch(Plane(origin=(40, 0, 0), x_dir=(0, 0, -1), z_dir=(1, 0, 0))):
        with Locations(Location((2.45, 4.25, 0), (0, 0, 90))):
            Circle(SKETCH_67_R)
        with Locations(Location((2.45, -3.75, 0), (0, 0, 90))):
            Circle(SKETCH_67_R)
        with Locations(Location((14.45, -3.75, 0), (0, 0, 90))):
            Circle(SKETCH_67_R)
        with Locations(Location((14.45, 4.25, 0), (0, 0, 90))):
            Circle(SKETCH_67_R)
    cut_extrude_31 = extrude(amount=-CUT_EXTRUDE_31_DEPTH, mode=Mode.SUBTRACT)

    # 镜向1: 切除-拉伸31 across plane
    add(cut_extrude_31.mirror(Plane(origin=(0, 0, 0), x_dir=(0, 0, 1), z_dir=(1, 0, 0))), mode=Mode.SUBTRACT)

    # 草图68 → 切除-拉伸32 (cut)
    with BuildSketch(Plane(origin=(0, 0, -18), x_dir=(-1, 0, 0), z_dir=(0, 0, -1))):
        with Locations((35.05, 0)):
            Rectangle(SKETCH_68_W, SKETCH_68_H)
    extrude(amount=-CUT_EXTRUDE_32_DEPTH, mode=Mode.SUBTRACT)

    # 草图69 → 凸台-拉伸36 (add)
    with BuildSketch(Plane.ZY.offset(18.55)):
        with Locations((11, 0)):
            Rectangle(SKETCH_69_W, SKETCH_69_H)
    extrude(amount=EXTRUDE_36_DEPTH)

    # 草图70 → 切除-拉伸33 (cut)
    with BuildSketch(Plane(origin=(0, 0, 70), x_dir=(-1, 0, 0), z_dir=(0, 0, -1))):
        Rectangle(SKETCH_70_W, SKETCH_70_H)
    extrude(amount=CUT_EXTRUDE_33_DEPTH, mode=Mode.SUBTRACT)

    # 草图73 → 切除-拉伸34 (cut)
    with BuildSketch(Plane(origin=(0, 0, 70), x_dir=(-1, 0, 0), z_dir=(0, 0, -1))):
        with Locations((0, -4.021373503)):
            Rectangle(SKETCH_73_W, SKETCH_73_H)
    extrude(amount=-CUT_EXTRUDE_34_DEPTH, mode=Mode.SUBTRACT)

    # 圆角5
    # the kernel refuses this fillet: 10 mm, written as the material it adds along each edge
    with BuildSketch(Plane(origin=(-27.5, 13.9, 86.2), x_dir=(0, -1, 0), z_dir=(0, 0, -1)), Plane(origin=(27.5, 13.9, 81.2), x_dir=(0, -1, 0), z_dir=(0, 0, 1))) as fillet_5_piece_1:
        with BuildLine():
            CenterArc((6, 10), FILLET_5_R, 233.130102354, 36.869897646)
            Line((0, 2), (0, 0))
            Line((0, 0), (6, 0))
        make_face()
    extrude(amount=5)

    # 草图75 → 凸台-拉伸38 (add)
    with BuildSketch(Plane(origin=(0, 0, 70), x_dir=(-1, 0, 0), z_dir=(0, 0, -1))):
        with Locations((0, -4.021373503)):
            Rectangle(SKETCH_75_W, SKETCH_75_H)
        with Locations((0, -4.021373503)):
            Rectangle(SKETCH_75_W_2, SKETCH_75_H_2, mode=Mode.SUBTRACT)
    extrude(amount=EXTRUDE_38_DEPTH)

    # 草图74 → 切除-拉伸35 (cut)
    with BuildSketch(Plane(origin=(10, 0, 0), x_dir=(0, 0, -1), z_dir=(1, 0, 0))):
        with BuildLine():
            Line((-82.596309624, -2.921373503), (-58.15800679, -2.921373503))
            ThreePointArc((-58.15800679, -2.921373503), (-57.05800679, -4.021373503), (-58.15800679, -5.121373503))
            Line((-58.15800679, -5.121373503), (-82.596309624, -5.121373503))
            ThreePointArc((-82.596309624, -5.121373503), (-83.696309624, -4.021373503), (-82.596309624, -2.921373503))
        make_face()
    extrude(amount=-CUT_EXTRUDE_35_DEPTH, mode=Mode.SUBTRACT)

    # 草图76 → 切除-拉伸36 (cut)
    with BuildSketch(Plane(origin=(0, 0, 55), x_dir=(-1, 0, 0), z_dir=(0, 0, -1))):
        Polygon((-6.35, 0.478626497), (-6.35, -8.521373503), (6.35, -8.521373503), (6.35, 0.478626497), (10, 0.478626497), (10, -10), (-10, -10), (-10, 0.478626497), align=None)
    extrude(amount=-CUT_EXTRUDE_36_DEPTH, mode=Mode.SUBTRACT)

    # 圆角6
    # the kernel refuses this fillet: 10 mm, written as the material it adds along each edge
    with BuildSketch(Plane(origin=(-6.35, -2.921373503, 80), x_dir=(-1, 0, 0), z_dir=(0, 1, 0)), Plane(origin=(6.35, 0.478626497, 80), x_dir=(1, 0, 0), z_dir=(0, -1, 0))) as fillet_6_piece_1:
        with BuildLine():
            CenterArc((10, -7.725121358), FILLET_6_R, 129.419984467, 50.580015533)
            Line((0, -7.725121358), (0, 0))
            Line((0, 0), (3.65, 0))
        make_face()
    extrude(amount=3.4)

    # 倒角6
    chamfer_6_edges = [part.edges().sort_by_distance(p)[0] for p in [
        (0, 1.957252994, 70),
    ]]
    chamfer(chamfer_6_edges, length=CHAMFER_6_SIZE)


solid = part.part
